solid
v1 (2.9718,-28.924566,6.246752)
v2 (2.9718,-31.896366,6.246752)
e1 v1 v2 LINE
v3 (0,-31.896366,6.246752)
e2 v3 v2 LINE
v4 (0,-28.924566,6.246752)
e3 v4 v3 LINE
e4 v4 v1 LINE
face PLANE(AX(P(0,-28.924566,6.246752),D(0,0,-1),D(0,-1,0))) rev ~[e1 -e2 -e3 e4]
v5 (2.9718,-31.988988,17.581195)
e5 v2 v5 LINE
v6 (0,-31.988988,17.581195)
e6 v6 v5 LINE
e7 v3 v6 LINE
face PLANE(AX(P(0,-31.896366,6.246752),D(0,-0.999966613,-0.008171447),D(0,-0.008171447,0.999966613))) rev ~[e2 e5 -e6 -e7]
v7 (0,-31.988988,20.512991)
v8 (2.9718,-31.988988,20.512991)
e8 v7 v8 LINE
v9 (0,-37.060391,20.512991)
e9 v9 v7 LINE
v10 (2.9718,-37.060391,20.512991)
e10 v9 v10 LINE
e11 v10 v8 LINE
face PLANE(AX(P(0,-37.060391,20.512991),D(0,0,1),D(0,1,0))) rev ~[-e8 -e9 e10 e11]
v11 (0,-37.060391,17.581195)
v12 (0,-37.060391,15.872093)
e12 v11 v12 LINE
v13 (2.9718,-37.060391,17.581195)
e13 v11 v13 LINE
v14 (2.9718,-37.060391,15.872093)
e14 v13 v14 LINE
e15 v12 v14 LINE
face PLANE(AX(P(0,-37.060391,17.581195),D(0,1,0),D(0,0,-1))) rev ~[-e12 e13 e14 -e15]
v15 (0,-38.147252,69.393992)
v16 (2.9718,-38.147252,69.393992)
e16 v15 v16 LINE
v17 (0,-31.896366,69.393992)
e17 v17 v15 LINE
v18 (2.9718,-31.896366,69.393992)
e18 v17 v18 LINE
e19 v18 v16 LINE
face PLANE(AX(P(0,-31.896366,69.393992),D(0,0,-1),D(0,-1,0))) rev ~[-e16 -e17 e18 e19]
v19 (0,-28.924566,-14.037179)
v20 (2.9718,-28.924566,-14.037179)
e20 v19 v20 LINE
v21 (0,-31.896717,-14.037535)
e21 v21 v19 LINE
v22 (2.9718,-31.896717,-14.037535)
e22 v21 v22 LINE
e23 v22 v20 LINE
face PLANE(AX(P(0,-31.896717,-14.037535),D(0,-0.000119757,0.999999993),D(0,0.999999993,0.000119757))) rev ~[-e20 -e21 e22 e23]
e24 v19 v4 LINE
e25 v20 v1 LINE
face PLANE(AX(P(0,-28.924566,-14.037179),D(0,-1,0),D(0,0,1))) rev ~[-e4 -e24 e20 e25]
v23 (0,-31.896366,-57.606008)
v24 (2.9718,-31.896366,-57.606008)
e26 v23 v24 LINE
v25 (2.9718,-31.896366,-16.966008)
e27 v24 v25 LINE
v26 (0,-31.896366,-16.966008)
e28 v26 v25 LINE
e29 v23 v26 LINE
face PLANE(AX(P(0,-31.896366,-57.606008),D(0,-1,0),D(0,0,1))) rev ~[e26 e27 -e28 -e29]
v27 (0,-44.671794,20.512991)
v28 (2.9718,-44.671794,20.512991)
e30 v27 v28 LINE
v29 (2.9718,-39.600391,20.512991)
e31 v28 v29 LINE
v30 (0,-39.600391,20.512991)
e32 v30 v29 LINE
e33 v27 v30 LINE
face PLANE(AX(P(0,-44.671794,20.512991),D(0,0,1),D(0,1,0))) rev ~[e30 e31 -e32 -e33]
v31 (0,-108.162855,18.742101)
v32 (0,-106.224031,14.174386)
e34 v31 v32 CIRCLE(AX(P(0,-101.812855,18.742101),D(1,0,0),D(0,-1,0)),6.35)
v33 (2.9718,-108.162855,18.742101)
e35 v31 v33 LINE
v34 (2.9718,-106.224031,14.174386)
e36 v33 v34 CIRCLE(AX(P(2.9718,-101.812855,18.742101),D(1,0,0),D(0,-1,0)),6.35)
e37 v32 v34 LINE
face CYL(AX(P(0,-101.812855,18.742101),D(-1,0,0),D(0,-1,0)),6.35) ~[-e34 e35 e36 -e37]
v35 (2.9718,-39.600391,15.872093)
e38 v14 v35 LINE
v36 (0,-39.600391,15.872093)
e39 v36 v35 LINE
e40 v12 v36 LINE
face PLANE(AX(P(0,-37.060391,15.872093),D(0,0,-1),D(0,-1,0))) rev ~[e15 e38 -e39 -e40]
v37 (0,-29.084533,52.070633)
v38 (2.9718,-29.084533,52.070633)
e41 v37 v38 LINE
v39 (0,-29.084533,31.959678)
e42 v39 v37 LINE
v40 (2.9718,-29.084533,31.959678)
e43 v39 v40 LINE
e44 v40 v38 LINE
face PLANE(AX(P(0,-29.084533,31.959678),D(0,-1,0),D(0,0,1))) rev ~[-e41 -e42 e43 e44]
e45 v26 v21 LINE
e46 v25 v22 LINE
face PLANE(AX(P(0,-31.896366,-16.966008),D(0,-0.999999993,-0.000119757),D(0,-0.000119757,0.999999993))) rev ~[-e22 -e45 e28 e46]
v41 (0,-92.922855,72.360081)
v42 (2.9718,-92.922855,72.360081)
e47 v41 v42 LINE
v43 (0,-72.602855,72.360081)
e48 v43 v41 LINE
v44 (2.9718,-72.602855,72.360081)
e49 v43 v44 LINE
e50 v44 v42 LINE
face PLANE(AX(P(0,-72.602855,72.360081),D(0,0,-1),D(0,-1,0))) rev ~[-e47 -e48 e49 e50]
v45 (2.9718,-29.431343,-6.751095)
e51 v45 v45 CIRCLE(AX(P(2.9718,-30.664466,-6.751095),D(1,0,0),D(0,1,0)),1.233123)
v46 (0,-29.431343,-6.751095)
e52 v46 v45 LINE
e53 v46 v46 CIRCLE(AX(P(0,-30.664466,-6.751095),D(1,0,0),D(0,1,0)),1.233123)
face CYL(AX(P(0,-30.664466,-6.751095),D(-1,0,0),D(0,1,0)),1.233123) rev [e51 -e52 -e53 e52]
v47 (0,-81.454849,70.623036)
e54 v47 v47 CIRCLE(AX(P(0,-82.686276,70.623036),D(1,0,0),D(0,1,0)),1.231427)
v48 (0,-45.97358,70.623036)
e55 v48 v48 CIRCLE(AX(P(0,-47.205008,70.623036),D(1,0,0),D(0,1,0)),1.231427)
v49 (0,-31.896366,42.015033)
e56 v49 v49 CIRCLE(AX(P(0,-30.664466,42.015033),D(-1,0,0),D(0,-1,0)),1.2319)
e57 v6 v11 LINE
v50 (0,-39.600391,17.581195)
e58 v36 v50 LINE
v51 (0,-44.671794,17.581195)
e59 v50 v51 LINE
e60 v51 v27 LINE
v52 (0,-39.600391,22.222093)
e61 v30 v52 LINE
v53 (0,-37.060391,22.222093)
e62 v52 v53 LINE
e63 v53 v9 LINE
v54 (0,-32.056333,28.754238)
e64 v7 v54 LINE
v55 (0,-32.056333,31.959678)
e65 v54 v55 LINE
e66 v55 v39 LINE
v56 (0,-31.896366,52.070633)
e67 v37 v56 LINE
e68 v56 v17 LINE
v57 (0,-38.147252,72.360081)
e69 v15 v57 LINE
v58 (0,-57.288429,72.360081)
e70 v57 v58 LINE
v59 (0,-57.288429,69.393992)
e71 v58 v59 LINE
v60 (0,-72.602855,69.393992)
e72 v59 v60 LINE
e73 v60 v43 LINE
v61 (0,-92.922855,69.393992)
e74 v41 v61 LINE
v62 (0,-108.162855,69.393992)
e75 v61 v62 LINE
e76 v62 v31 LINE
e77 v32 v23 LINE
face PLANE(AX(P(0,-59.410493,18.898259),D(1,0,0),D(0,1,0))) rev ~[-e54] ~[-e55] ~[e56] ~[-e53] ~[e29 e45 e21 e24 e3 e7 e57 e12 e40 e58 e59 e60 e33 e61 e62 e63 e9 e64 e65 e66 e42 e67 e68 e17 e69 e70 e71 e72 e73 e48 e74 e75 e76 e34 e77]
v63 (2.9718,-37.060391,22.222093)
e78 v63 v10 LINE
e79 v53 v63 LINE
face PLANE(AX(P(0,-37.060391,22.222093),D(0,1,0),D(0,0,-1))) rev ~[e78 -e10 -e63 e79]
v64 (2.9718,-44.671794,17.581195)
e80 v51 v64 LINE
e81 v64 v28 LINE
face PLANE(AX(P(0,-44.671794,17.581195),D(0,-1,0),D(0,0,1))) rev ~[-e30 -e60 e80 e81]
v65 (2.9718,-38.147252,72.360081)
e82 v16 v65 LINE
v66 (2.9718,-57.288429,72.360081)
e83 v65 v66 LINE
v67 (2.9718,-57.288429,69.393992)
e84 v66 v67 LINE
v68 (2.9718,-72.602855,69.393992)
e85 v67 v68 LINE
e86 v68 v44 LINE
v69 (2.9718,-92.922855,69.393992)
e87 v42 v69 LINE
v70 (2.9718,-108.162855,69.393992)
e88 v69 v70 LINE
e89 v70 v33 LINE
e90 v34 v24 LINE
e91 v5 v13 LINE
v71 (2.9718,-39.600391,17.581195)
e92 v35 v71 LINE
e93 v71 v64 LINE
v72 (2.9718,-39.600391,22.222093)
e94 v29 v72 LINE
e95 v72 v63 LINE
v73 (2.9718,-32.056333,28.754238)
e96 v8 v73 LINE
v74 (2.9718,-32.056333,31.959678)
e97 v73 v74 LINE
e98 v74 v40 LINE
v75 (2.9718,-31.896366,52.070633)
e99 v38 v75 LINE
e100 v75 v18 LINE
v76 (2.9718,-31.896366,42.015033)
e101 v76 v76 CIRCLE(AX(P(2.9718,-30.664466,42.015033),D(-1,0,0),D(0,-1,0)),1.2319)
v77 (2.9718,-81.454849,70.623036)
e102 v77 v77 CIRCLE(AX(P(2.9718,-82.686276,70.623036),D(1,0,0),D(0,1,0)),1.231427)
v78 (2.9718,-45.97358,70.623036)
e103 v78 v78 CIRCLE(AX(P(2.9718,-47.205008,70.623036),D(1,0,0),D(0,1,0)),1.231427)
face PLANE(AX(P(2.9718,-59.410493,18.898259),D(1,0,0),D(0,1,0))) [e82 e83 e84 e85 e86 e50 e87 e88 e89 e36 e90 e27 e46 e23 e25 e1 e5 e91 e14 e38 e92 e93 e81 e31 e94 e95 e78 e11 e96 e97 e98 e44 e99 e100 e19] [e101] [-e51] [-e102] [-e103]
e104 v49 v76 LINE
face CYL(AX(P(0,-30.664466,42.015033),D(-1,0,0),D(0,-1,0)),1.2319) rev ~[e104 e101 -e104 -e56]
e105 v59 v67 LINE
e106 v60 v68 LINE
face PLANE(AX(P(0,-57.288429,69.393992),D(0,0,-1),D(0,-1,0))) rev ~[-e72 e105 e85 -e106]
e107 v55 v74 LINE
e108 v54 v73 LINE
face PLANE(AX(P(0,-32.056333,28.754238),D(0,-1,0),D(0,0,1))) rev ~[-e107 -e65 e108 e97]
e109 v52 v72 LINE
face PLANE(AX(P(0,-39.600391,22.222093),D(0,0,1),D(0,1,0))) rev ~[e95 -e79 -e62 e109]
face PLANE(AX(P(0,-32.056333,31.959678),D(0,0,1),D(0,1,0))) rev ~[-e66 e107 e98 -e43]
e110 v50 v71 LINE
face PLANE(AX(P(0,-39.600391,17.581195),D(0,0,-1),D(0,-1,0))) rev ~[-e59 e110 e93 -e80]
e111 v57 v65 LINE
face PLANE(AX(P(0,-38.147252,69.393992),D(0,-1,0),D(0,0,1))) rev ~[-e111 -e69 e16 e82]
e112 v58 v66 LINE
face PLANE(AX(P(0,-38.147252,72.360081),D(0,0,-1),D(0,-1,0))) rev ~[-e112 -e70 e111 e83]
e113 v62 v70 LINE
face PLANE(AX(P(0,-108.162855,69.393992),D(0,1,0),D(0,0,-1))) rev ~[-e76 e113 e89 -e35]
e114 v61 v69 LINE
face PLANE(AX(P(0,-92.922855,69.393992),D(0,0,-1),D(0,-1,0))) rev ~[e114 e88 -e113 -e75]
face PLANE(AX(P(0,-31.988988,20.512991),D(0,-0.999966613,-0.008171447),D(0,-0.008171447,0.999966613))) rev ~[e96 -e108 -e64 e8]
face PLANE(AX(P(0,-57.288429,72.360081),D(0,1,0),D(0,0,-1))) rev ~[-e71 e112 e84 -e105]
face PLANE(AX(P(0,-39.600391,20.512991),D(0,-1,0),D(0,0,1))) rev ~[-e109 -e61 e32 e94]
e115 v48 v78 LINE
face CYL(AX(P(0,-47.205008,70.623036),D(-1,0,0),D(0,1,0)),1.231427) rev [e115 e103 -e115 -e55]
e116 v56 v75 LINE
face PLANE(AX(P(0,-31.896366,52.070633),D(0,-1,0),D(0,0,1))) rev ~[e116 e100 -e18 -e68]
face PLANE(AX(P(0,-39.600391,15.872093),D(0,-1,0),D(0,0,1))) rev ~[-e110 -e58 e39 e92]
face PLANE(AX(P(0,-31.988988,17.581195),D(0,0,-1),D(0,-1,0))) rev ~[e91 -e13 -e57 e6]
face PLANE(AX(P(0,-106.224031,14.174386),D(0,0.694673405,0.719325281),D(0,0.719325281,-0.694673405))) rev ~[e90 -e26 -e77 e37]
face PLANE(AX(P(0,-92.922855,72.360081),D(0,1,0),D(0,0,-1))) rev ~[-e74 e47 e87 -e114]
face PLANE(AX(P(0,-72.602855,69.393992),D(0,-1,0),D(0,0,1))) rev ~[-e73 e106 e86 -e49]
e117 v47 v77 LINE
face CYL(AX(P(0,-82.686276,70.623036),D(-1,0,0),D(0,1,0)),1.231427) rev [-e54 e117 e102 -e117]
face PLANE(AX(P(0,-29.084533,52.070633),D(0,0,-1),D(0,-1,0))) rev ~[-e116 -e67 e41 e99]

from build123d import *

# Parameters (mm, degrees)
F0_R     = 1.2331232955
F0_R_2   = 1.2314274958
F1_DEPTH = 2.9718


# Not quite as in the source:
# - a feature names something its author has since deleted; it is built from what else it names


with BuildPart() as f1:
    # F0 (on Right) → F1 (new body)
    with BuildSketch(Plane.YZ):
        with BuildLine():
            Line((-31.8963663923, 52.0706325769), (-31.8963663923, 69.3939922799))
            Line((-31.8963663923, 69.3939922799), (-36.9763663923, 69.3939922799))
            Line((-36.9763663923, 69.3939922799), (-38.147252053, 69.3939922799))
            Line((-38.147252053, 69.3939922799), (-38.147252053, 72.360080524))
            Line((-38.147252053, 72.360080524), (-57.2884293294, 72.360080524))
            Line((-57.2884293294, 72.360080524), (-57.2884293294, 69.3939922799))
            Line((-57.2884293294, 69.3939922799), (-72.6028546119, 69.3939922799))
            Line((-72.6028546119, 69.3939922799), (-72.6028546119, 72.360080524))
            Line((-72.6028546119, 72.360080524), (-92.9228546119, 72.360080524))
            Line((-92.9228546119, 72.360080524), (-92.9228546119, 69.3939922799))
            Line((-92.9228546119, 69.3939922799), (-108.1628546119, 69.3939922799))
            Line((-108.1628546119, 69.3939922799), (-108.1628546119, 18.7421012782))
            ThreePointArc((-108.1628546119, 18.7421012782), (-107.6580863604, 16.2610196982), (-106.2240307358, 14.1743857437))
            Line((-106.2240307358, 14.1743857437), (-31.8963663923, -57.6060077201))
            Line((-31.8963663923, -57.6060077201), (-31.8963663923, -16.9660077201))
            Line((-31.8963663923, -16.9660077201), (-31.8967170966, -14.0375348575))
            Line((-31.8967170966, -14.0375348575), (-28.9245663923, -14.0371789226))
            Line((-28.9245663923, -14.0371789226), (-28.9245663923, 3.3539922799))
            Line((-28.9245663923, 3.3539922799), (-28.9245663923, 6.2467521057))
            Line((-28.9245663923, 6.2467521057), (-31.8963663923, 6.2467521057))
            Line((-31.8963663923, 6.2467521057), (-31.988988285, 17.581195007))
            Line((-31.988988285, 17.581195007), (-37.0603909409, 17.581195007))
            Line((-37.0603909409, 17.581195007), (-37.0603909409, 15.8720928303))
            Line((-37.0603909409, 15.8720928303), (-39.6003909409, 15.8720928303))
            Line((-39.6003909409, 15.8720928303), (-39.6003909409, 17.581195007))
            Line((-39.6003909409, 17.581195007), (-44.6717935968, 17.581195007))
            Line((-44.6717935968, 17.581195007), (-44.6717935968, 20.5129906535))
            Line((-44.6717935968, 20.5129906535), (-39.6003909409, 20.5129906535))
            Line((-39.6003909409, 20.5129906535), (-39.6003909409, 22.2220928303))
            Line((-39.6003909409, 22.2220928303), (-37.0603909409, 22.2220928303))
            Line((-37.0603909409, 22.2220928303), (-37.0603909409, 20.5129906535))
            Line((-37.0603909409, 20.5129906535), (-31.988988285, 20.5129906535))
            Line((-31.988988285, 20.5129906535), (-32.0563334468, 28.7542376011))
            Line((-32.0563334468, 28.7542376011), (-32.0563334468, 31.9596784297))
            Line((-32.0563334468, 31.9596784297), (-29.0845334468, 31.9596784297))
            Line((-29.0845334468, 31.9596784297), (-29.0845334468, 49.0742376011))
            Line((-29.0845334468, 49.0742376011), (-29.0845334468, 52.0706325769))
            Line((-29.0845334468, 52.0706325769), (-31.8963663923, 52.0706325769))
        make_face()
        with Locations((-30.6644663923, -6.7510945896)):
            Circle(F0_R, mode=Mode.SUBTRACT)
        with Locations((-82.6862763941, 70.623036402)):
            Circle(F0_R_2, mode=Mode.SUBTRACT)
        with BuildLine():
            ThreePointArc((-29.4325663923, 42.0150328428), (-30.6644663923, 40.7831328428), (-31.8963663923, 42.0150328428))
            ThreePointArc((-31.8963663923, 42.0150328428), (-30.6644663923, 43.2469328428), (-29.4325663923, 42.0150328428))
        make_face(mode=Mode.SUBTRACT)
        with Locations((-47.2050075472, 70.623036402)):
            Circle(F0_R_2, mode=Mode.SUBTRACT)
    extrude(amount=F1_DEPTH)


solid = f1.part
